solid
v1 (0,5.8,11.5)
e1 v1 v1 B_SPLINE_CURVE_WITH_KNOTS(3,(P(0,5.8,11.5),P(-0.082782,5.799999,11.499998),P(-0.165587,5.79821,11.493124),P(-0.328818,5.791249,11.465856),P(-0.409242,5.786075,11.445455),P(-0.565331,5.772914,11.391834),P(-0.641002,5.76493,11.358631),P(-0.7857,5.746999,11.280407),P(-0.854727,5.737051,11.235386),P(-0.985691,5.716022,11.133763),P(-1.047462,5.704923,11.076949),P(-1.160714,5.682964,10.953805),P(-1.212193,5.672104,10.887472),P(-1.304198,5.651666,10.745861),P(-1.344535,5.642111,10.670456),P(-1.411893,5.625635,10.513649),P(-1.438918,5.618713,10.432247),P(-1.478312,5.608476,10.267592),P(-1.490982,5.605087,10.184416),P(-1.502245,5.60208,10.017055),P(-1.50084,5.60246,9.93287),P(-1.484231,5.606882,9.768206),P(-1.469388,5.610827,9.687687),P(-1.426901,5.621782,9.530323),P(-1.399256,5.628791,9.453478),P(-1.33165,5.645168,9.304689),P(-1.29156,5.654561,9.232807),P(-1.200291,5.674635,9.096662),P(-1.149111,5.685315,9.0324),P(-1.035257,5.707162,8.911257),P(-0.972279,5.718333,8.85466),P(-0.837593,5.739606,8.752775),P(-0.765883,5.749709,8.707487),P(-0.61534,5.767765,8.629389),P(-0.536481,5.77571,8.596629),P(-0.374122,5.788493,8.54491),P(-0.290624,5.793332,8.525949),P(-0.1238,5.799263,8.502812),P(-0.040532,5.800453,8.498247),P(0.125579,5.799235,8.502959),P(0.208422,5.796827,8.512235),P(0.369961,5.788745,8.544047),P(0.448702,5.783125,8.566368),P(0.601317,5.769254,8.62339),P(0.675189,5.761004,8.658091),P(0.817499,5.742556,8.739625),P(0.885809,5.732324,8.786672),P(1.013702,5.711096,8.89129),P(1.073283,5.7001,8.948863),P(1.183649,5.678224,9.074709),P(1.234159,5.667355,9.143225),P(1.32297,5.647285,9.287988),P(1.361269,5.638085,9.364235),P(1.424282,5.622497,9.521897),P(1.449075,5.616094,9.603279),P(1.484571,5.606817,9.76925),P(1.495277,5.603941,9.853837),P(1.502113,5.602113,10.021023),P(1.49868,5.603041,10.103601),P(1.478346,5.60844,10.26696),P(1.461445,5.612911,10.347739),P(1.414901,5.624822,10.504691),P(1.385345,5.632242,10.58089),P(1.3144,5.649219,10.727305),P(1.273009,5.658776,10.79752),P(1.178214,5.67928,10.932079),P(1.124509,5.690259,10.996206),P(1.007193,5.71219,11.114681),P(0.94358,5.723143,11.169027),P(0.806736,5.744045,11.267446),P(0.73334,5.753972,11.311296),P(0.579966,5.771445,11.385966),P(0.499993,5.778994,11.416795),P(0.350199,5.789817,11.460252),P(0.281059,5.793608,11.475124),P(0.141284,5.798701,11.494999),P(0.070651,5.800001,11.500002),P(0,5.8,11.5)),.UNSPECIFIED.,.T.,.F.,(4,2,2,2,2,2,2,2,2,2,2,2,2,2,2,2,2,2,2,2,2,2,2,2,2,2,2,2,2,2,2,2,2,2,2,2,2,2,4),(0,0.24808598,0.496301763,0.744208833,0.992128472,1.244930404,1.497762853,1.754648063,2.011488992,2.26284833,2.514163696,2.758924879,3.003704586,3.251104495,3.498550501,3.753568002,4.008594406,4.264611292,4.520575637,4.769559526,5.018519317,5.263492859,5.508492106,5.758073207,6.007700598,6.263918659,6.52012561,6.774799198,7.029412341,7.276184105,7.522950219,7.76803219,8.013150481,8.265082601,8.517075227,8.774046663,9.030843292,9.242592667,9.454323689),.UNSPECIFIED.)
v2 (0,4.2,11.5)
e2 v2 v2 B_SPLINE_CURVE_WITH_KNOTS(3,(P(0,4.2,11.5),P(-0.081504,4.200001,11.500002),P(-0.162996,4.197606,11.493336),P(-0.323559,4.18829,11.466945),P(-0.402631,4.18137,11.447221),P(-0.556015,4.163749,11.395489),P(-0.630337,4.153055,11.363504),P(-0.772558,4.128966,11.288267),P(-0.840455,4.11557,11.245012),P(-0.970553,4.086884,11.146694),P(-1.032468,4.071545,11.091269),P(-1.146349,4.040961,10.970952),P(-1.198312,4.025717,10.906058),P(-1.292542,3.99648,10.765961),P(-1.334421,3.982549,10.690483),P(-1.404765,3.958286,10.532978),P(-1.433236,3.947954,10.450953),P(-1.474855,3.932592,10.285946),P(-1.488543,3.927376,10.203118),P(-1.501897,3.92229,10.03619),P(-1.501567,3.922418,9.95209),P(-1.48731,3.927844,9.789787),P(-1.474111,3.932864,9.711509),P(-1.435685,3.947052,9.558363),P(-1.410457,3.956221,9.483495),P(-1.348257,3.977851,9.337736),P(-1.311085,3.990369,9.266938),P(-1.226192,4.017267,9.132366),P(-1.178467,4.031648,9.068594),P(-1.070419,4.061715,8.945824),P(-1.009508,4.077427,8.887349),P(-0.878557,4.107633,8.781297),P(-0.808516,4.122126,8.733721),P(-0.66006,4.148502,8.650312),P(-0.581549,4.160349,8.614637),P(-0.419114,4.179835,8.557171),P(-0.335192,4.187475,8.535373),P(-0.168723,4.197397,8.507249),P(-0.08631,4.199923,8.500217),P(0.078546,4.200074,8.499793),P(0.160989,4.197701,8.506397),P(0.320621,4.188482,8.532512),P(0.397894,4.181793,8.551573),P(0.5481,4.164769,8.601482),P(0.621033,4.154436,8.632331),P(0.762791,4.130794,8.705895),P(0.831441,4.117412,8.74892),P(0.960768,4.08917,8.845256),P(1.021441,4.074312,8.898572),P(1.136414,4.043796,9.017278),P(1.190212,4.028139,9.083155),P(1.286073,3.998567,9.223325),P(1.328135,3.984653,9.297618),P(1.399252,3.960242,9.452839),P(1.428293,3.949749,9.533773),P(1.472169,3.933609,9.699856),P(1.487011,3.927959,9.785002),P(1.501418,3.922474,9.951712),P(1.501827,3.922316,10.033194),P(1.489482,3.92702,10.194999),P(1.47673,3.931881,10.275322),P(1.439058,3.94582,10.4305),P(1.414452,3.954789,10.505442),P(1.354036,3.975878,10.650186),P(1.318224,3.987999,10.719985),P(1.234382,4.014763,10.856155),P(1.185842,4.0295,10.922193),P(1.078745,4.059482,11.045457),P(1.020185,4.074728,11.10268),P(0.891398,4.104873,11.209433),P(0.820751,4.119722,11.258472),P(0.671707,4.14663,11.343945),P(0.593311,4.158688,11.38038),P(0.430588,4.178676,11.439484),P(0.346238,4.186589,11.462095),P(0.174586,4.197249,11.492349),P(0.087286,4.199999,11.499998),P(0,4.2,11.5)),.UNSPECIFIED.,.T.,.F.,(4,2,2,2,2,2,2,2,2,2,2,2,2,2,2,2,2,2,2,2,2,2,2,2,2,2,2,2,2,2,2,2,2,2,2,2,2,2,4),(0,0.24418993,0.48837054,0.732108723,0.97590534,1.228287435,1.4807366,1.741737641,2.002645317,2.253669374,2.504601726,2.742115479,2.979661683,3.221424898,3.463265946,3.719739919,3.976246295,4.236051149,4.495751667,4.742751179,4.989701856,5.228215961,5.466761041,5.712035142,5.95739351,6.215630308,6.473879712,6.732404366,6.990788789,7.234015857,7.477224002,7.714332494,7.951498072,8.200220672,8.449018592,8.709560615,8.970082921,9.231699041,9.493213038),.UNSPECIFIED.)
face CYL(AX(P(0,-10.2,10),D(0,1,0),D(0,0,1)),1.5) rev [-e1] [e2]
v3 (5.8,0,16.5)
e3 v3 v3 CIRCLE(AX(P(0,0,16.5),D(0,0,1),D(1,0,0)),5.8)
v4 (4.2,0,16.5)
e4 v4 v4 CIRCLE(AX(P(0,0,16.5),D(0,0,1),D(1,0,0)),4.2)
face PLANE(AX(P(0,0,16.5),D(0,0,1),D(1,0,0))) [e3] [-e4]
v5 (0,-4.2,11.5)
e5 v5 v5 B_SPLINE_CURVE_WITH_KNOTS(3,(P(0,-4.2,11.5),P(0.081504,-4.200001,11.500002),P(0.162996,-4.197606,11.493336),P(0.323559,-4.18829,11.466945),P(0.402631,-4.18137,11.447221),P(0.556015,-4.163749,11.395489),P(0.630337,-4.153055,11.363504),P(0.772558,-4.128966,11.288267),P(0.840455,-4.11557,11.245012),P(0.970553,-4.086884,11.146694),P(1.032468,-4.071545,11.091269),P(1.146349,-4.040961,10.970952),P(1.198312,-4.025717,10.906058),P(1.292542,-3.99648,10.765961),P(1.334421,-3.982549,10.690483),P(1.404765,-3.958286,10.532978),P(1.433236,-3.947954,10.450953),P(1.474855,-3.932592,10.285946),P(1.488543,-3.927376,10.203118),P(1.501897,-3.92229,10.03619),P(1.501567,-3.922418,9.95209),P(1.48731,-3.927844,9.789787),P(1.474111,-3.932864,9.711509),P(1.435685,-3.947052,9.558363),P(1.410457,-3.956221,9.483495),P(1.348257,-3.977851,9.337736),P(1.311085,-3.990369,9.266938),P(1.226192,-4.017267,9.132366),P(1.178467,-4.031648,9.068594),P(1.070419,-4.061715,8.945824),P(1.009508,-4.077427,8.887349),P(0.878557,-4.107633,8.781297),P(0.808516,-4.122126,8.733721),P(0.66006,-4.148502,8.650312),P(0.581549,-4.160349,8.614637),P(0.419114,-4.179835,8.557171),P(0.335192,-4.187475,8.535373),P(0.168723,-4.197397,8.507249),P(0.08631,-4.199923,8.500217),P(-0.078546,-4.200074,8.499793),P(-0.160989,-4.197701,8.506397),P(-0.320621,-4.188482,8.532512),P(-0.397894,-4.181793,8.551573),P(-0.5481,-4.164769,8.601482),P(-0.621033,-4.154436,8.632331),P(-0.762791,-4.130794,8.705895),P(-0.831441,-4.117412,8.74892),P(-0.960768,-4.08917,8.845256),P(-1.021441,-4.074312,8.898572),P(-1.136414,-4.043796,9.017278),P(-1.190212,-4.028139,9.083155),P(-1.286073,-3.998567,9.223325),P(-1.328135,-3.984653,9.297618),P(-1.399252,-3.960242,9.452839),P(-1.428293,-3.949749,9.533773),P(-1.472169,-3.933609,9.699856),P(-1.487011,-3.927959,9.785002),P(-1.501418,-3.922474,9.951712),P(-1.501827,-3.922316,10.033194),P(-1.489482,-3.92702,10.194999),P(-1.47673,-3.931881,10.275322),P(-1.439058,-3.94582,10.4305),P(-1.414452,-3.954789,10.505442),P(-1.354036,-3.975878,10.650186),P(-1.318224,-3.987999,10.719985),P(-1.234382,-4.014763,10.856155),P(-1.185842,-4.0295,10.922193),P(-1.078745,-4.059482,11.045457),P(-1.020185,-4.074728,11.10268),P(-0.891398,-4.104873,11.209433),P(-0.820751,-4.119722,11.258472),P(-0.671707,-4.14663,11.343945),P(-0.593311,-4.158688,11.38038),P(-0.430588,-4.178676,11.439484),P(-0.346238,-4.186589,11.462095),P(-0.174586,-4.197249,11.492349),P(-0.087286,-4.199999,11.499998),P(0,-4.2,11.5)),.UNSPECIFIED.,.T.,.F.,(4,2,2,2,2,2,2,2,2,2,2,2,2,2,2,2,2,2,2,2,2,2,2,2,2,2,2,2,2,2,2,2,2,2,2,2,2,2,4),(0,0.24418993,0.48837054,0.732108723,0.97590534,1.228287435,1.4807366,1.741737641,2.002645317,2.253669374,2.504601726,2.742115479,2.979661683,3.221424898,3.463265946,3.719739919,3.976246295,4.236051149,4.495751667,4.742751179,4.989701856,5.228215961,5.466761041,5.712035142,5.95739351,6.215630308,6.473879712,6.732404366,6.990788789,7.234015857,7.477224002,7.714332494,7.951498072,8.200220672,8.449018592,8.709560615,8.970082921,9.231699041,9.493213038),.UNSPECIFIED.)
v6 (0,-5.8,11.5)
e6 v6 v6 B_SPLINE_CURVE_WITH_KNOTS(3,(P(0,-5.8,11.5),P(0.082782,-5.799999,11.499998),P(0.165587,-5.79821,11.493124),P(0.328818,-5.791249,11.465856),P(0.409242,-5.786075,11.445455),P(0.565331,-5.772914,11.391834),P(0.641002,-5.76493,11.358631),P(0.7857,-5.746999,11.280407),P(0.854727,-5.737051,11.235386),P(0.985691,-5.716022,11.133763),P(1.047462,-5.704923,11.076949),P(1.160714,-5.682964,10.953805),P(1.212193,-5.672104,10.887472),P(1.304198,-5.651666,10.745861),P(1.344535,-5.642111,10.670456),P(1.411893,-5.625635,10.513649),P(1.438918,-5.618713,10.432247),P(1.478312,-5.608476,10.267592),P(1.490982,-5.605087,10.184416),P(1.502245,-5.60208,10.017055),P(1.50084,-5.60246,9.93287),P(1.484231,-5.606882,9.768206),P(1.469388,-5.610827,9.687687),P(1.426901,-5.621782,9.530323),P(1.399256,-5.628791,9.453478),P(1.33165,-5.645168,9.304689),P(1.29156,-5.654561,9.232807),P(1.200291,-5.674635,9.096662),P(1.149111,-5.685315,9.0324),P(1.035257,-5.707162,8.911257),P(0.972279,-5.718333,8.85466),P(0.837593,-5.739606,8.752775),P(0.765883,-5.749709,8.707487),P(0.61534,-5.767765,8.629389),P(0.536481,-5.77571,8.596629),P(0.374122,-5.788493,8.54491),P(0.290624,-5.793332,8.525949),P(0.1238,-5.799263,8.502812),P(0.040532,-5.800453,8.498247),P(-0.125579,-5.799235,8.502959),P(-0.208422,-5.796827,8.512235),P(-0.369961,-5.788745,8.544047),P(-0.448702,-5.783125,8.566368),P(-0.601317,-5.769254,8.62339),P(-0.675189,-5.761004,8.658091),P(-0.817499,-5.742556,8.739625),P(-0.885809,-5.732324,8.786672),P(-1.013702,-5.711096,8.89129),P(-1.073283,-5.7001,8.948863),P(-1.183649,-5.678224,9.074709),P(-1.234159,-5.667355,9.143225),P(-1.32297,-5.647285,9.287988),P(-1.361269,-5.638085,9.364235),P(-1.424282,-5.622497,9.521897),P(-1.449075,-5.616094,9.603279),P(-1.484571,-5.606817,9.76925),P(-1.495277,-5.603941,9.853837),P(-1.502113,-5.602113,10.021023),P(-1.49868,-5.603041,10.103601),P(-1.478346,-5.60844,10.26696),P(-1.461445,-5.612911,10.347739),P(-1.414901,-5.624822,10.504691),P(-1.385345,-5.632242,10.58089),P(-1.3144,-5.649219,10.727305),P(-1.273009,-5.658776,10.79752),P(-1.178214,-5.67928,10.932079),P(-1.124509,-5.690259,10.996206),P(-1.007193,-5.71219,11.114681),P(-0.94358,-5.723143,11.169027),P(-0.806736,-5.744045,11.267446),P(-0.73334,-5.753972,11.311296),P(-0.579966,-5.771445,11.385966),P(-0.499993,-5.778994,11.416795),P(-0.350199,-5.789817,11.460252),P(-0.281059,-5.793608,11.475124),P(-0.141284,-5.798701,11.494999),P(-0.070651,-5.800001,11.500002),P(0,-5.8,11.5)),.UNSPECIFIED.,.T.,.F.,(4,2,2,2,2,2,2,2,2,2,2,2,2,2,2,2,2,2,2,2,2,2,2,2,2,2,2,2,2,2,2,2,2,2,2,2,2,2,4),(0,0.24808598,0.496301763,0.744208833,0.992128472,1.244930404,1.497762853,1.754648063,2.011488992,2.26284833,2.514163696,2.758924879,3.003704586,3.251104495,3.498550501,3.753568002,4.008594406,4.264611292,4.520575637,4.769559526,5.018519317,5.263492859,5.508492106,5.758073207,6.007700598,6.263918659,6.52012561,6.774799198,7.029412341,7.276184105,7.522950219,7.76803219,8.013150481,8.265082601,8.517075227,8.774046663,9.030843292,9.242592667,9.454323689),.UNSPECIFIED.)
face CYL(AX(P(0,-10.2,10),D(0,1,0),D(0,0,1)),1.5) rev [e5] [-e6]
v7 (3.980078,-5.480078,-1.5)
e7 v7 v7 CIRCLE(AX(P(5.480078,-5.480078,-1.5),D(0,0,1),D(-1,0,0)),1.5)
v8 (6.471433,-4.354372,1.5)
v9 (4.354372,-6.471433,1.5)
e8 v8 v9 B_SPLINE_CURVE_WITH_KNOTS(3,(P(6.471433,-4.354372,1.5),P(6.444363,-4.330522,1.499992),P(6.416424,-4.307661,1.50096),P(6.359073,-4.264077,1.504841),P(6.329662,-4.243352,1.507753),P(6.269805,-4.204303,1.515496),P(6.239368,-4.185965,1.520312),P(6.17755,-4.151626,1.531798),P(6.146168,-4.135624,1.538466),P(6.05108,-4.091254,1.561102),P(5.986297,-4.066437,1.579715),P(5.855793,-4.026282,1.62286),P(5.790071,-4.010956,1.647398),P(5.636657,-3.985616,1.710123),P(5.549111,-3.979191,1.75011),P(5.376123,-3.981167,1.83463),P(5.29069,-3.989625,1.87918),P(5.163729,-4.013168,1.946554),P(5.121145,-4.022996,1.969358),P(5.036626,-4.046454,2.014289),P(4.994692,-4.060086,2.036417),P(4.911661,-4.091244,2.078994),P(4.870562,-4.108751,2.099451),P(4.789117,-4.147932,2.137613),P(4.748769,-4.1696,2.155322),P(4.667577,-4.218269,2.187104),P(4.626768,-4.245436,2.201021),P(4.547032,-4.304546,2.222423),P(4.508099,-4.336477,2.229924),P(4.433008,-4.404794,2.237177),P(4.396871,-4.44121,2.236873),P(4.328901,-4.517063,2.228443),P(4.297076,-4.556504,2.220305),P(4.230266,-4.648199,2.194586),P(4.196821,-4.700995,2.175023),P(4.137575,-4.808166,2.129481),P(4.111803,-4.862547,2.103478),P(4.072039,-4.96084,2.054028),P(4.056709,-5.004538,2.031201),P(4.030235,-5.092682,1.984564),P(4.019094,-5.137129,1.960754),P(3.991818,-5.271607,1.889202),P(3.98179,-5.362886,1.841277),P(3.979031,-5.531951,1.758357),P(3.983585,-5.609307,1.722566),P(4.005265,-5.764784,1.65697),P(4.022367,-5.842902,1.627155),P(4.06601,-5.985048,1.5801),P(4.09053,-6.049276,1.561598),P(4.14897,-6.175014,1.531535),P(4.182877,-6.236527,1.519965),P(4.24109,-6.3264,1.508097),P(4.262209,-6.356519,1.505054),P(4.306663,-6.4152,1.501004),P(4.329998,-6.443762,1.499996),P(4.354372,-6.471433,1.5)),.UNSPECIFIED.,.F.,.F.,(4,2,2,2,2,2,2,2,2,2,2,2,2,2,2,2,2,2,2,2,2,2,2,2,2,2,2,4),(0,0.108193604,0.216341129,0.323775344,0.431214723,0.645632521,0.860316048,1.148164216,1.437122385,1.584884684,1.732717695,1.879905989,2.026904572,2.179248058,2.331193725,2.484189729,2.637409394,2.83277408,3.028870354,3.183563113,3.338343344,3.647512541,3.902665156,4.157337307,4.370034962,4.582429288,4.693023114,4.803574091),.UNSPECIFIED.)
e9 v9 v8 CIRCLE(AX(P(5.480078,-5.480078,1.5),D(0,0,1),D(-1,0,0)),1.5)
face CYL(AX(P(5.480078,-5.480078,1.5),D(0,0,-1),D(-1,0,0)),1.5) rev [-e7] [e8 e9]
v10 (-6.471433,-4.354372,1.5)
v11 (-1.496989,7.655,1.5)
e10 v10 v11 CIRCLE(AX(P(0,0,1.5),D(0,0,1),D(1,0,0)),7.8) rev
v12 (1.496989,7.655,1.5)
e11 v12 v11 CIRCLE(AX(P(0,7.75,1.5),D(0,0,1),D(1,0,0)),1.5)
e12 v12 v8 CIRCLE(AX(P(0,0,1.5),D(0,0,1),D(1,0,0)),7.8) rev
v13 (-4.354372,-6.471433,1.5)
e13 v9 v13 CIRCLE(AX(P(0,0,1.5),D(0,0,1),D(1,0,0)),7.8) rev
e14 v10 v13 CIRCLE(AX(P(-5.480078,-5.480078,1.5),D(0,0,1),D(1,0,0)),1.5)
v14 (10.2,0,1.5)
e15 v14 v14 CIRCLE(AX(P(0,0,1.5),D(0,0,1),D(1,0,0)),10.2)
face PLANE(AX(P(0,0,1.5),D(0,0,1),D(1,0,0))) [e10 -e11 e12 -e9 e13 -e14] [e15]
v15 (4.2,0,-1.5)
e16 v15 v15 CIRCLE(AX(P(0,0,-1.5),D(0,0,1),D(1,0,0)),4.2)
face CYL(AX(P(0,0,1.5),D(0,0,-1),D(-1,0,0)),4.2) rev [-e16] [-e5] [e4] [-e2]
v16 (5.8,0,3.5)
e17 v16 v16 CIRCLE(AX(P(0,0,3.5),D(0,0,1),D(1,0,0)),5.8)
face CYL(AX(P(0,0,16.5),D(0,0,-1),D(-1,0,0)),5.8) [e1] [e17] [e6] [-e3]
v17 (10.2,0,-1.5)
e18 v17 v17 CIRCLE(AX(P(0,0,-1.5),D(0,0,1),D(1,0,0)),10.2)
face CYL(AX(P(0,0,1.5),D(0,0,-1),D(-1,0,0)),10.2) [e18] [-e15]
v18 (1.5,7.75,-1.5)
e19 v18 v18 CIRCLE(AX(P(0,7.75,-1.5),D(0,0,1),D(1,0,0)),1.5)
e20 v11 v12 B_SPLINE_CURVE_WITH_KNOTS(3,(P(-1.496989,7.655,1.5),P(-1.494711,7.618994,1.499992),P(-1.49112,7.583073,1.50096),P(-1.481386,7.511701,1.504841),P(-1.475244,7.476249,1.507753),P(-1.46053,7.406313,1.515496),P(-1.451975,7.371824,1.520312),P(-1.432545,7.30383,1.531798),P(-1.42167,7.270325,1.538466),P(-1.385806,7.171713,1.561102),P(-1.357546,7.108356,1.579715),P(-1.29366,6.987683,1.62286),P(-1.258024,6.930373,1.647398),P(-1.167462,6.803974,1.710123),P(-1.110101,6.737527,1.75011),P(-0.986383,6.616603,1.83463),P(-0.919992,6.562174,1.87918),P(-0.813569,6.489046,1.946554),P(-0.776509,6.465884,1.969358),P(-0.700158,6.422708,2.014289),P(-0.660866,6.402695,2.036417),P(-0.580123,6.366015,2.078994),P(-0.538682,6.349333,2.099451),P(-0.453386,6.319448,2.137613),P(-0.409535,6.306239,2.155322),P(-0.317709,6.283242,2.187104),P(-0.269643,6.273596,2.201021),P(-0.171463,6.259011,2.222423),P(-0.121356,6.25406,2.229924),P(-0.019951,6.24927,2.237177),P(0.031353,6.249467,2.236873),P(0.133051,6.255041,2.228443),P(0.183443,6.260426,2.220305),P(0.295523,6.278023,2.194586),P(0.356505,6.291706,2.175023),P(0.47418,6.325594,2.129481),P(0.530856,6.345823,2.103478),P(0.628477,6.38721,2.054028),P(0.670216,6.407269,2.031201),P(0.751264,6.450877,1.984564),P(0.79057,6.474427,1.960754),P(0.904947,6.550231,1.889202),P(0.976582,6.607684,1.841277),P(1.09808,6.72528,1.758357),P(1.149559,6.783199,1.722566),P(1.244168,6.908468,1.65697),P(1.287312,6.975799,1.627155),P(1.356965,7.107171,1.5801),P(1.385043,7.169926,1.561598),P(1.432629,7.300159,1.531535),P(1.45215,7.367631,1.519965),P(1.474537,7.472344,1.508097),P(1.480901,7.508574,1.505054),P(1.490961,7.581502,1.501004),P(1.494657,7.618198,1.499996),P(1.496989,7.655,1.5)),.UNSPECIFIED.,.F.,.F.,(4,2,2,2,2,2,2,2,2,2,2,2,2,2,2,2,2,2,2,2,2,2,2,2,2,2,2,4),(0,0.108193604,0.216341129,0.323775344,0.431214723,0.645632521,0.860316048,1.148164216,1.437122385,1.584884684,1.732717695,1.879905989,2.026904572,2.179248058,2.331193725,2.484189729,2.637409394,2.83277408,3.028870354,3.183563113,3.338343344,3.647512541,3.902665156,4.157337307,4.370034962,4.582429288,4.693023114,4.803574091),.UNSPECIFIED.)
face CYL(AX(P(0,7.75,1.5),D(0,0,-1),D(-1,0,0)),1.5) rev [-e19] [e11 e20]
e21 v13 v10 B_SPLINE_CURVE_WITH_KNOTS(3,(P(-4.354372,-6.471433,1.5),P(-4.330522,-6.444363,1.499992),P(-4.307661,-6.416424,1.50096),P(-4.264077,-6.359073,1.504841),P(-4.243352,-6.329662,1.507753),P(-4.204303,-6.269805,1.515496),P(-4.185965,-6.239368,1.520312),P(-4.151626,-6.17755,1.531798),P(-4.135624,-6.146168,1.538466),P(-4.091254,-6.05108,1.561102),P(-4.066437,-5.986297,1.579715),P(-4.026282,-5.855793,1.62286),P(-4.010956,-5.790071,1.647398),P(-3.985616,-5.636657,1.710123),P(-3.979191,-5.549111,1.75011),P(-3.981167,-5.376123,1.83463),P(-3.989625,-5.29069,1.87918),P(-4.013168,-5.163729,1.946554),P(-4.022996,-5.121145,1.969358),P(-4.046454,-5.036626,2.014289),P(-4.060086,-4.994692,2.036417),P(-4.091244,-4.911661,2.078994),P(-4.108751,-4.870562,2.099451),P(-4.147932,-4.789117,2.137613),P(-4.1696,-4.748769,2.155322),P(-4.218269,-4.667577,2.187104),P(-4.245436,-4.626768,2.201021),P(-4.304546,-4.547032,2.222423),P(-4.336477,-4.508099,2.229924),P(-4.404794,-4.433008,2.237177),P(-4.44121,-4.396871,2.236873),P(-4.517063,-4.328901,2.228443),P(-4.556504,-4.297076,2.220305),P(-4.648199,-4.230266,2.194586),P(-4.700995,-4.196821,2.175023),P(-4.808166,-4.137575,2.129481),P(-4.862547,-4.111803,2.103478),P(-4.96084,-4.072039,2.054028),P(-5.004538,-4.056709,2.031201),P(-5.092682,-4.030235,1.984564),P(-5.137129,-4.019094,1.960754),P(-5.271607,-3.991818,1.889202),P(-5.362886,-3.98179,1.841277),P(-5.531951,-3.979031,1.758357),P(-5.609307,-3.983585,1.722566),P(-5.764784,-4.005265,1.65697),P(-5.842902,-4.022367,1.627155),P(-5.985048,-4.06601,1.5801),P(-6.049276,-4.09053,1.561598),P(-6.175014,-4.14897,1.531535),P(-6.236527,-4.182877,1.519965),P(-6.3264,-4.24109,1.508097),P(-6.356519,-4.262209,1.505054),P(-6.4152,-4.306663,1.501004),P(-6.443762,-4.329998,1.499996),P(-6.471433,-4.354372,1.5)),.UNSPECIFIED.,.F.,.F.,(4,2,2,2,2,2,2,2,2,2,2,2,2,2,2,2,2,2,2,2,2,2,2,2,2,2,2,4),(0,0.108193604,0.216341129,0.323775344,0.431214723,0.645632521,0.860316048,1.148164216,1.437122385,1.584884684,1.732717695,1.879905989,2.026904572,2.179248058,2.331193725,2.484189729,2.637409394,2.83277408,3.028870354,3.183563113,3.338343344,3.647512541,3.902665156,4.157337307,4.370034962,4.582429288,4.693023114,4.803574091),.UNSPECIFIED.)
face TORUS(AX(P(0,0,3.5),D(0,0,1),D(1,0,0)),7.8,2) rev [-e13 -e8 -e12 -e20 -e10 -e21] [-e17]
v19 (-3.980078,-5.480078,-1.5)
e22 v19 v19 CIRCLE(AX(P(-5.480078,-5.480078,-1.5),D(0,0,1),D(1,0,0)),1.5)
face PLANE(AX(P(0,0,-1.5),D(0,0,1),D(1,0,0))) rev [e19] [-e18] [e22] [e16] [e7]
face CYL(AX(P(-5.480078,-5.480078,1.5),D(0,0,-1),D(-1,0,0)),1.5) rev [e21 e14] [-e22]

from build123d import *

# Parameters (mm, degrees)
SKETCH_1_R               = 10.2
SKETCH_1_R_2             = 4.2
SKETCH_1_R_3             = 1.5
EXTRUDE_1_DEPTH          = 1.5
SKETCH_2_R               = 5.8
SKETCH_2_R_2             = 4.2
EXTRUDE_2_DEPTH          = 15
FILLET_1_R               = 2
CUT_EXTRUDE_1_DEPTH      = 22.916432191
CUT_EXTRUDE_1_DEPTH_BACK = 22.916432191
SKETCH_3_R               = 1.5


with BuildPart() as part:
    # Эскиз1 → Бобышка-Вытянуть1 (new, symmetric)
    with BuildSketch(Plane.XY):
        Circle(SKETCH_1_R)
        Circle(SKETCH_1_R_2, mode=Mode.SUBTRACT)
        with Locations((0, 7.75)):
            Circle(SKETCH_1_R_3, mode=Mode.SUBTRACT)
        with Locations((-5.480077554, -5.480077554)):
            Circle(SKETCH_1_R_3, mode=Mode.SUBTRACT)
        with Locations(Location((5.480077554, -5.480077554, 0), (0, 0, 180))):
            Circle(SKETCH_1_R_3, mode=Mode.SUBTRACT)
    extrude(amount=EXTRUDE_1_DEPTH, both=True)

    # Эскиз2 → Бобышка-Вытянуть2 (add)
    with BuildSketch(Plane.XY.offset(1.5)):
        Circle(SKETCH_2_R)
        Circle(SKETCH_2_R_2, mode=Mode.SUBTRACT)
    extrude(amount=EXTRUDE_2_DEPTH)

    # Скругление1
    # the kernel refuses this fillet: 2 mm, written as the material it adds along each edge
    with BuildSketch(Plane(origin=(0, 0, 1.5), x_dir=(1, 0, 0), z_dir=(0, -1, 0))) as fillet_1_piece_1_section:
        with BuildLine():
            CenterArc((5.8 + FILLET_1_R, FILLET_1_R), FILLET_1_R, 180, 90)
            Line((5.8, FILLET_1_R), (5.8, 0))
            Line((5.8, 0), (5.8 + FILLET_1_R, 0))
        make_face()
    fillet_1_piece_1 = revolve(axis=Axis((0, 0, 1.5), (0, 0, 1)), mode=Mode.PRIVATE)
    fillet_1_piece_1 = fillet_1_piece_1 - Plane(origin=(-5.480077554, -5.480077554, 2.062024649), x_dir=(1, 0, 0), z_dir=(0, 0, -1)) * Cylinder(1.5, 32, mode=Mode.PRIVATE)
    fillet_1_piece_1 = fillet_1_piece_1 - Plane(origin=(5.480077554, -5.480077554, 2.062024649), x_dir=(-1, 0, 0), z_dir=(0, 0, -1)) * Cylinder(1.5, 32, mode=Mode.PRIVATE)
    fillet_1_piece_1 = fillet_1_piece_1 - Plane(origin=(0, 7.75, 2.062024649), x_dir=(1, 0, 0), z_dir=(0, 0, -1)) * Cylinder(1.5, 32, mode=Mode.PRIVATE)
    add(fillet_1_piece_1)

    # Эскиз3 → Вырез-Вытянуть1 (cut, two sides: drawn at the far end of the back side and taken through both)
    with BuildSketch(Plane(origin=(0, 0, 0), x_dir=(1, 0, 0), z_dir=(0, 1, 0)).offset(-CUT_EXTRUDE_1_DEPTH_BACK)):
        with Locations(Location((0, -10, 0), (0, 0, 270))):
            Circle(SKETCH_3_R)
    extrude(amount=CUT_EXTRUDE_1_DEPTH + CUT_EXTRUDE_1_DEPTH_BACK, mode=Mode.SUBTRACT)


solid = part.part
